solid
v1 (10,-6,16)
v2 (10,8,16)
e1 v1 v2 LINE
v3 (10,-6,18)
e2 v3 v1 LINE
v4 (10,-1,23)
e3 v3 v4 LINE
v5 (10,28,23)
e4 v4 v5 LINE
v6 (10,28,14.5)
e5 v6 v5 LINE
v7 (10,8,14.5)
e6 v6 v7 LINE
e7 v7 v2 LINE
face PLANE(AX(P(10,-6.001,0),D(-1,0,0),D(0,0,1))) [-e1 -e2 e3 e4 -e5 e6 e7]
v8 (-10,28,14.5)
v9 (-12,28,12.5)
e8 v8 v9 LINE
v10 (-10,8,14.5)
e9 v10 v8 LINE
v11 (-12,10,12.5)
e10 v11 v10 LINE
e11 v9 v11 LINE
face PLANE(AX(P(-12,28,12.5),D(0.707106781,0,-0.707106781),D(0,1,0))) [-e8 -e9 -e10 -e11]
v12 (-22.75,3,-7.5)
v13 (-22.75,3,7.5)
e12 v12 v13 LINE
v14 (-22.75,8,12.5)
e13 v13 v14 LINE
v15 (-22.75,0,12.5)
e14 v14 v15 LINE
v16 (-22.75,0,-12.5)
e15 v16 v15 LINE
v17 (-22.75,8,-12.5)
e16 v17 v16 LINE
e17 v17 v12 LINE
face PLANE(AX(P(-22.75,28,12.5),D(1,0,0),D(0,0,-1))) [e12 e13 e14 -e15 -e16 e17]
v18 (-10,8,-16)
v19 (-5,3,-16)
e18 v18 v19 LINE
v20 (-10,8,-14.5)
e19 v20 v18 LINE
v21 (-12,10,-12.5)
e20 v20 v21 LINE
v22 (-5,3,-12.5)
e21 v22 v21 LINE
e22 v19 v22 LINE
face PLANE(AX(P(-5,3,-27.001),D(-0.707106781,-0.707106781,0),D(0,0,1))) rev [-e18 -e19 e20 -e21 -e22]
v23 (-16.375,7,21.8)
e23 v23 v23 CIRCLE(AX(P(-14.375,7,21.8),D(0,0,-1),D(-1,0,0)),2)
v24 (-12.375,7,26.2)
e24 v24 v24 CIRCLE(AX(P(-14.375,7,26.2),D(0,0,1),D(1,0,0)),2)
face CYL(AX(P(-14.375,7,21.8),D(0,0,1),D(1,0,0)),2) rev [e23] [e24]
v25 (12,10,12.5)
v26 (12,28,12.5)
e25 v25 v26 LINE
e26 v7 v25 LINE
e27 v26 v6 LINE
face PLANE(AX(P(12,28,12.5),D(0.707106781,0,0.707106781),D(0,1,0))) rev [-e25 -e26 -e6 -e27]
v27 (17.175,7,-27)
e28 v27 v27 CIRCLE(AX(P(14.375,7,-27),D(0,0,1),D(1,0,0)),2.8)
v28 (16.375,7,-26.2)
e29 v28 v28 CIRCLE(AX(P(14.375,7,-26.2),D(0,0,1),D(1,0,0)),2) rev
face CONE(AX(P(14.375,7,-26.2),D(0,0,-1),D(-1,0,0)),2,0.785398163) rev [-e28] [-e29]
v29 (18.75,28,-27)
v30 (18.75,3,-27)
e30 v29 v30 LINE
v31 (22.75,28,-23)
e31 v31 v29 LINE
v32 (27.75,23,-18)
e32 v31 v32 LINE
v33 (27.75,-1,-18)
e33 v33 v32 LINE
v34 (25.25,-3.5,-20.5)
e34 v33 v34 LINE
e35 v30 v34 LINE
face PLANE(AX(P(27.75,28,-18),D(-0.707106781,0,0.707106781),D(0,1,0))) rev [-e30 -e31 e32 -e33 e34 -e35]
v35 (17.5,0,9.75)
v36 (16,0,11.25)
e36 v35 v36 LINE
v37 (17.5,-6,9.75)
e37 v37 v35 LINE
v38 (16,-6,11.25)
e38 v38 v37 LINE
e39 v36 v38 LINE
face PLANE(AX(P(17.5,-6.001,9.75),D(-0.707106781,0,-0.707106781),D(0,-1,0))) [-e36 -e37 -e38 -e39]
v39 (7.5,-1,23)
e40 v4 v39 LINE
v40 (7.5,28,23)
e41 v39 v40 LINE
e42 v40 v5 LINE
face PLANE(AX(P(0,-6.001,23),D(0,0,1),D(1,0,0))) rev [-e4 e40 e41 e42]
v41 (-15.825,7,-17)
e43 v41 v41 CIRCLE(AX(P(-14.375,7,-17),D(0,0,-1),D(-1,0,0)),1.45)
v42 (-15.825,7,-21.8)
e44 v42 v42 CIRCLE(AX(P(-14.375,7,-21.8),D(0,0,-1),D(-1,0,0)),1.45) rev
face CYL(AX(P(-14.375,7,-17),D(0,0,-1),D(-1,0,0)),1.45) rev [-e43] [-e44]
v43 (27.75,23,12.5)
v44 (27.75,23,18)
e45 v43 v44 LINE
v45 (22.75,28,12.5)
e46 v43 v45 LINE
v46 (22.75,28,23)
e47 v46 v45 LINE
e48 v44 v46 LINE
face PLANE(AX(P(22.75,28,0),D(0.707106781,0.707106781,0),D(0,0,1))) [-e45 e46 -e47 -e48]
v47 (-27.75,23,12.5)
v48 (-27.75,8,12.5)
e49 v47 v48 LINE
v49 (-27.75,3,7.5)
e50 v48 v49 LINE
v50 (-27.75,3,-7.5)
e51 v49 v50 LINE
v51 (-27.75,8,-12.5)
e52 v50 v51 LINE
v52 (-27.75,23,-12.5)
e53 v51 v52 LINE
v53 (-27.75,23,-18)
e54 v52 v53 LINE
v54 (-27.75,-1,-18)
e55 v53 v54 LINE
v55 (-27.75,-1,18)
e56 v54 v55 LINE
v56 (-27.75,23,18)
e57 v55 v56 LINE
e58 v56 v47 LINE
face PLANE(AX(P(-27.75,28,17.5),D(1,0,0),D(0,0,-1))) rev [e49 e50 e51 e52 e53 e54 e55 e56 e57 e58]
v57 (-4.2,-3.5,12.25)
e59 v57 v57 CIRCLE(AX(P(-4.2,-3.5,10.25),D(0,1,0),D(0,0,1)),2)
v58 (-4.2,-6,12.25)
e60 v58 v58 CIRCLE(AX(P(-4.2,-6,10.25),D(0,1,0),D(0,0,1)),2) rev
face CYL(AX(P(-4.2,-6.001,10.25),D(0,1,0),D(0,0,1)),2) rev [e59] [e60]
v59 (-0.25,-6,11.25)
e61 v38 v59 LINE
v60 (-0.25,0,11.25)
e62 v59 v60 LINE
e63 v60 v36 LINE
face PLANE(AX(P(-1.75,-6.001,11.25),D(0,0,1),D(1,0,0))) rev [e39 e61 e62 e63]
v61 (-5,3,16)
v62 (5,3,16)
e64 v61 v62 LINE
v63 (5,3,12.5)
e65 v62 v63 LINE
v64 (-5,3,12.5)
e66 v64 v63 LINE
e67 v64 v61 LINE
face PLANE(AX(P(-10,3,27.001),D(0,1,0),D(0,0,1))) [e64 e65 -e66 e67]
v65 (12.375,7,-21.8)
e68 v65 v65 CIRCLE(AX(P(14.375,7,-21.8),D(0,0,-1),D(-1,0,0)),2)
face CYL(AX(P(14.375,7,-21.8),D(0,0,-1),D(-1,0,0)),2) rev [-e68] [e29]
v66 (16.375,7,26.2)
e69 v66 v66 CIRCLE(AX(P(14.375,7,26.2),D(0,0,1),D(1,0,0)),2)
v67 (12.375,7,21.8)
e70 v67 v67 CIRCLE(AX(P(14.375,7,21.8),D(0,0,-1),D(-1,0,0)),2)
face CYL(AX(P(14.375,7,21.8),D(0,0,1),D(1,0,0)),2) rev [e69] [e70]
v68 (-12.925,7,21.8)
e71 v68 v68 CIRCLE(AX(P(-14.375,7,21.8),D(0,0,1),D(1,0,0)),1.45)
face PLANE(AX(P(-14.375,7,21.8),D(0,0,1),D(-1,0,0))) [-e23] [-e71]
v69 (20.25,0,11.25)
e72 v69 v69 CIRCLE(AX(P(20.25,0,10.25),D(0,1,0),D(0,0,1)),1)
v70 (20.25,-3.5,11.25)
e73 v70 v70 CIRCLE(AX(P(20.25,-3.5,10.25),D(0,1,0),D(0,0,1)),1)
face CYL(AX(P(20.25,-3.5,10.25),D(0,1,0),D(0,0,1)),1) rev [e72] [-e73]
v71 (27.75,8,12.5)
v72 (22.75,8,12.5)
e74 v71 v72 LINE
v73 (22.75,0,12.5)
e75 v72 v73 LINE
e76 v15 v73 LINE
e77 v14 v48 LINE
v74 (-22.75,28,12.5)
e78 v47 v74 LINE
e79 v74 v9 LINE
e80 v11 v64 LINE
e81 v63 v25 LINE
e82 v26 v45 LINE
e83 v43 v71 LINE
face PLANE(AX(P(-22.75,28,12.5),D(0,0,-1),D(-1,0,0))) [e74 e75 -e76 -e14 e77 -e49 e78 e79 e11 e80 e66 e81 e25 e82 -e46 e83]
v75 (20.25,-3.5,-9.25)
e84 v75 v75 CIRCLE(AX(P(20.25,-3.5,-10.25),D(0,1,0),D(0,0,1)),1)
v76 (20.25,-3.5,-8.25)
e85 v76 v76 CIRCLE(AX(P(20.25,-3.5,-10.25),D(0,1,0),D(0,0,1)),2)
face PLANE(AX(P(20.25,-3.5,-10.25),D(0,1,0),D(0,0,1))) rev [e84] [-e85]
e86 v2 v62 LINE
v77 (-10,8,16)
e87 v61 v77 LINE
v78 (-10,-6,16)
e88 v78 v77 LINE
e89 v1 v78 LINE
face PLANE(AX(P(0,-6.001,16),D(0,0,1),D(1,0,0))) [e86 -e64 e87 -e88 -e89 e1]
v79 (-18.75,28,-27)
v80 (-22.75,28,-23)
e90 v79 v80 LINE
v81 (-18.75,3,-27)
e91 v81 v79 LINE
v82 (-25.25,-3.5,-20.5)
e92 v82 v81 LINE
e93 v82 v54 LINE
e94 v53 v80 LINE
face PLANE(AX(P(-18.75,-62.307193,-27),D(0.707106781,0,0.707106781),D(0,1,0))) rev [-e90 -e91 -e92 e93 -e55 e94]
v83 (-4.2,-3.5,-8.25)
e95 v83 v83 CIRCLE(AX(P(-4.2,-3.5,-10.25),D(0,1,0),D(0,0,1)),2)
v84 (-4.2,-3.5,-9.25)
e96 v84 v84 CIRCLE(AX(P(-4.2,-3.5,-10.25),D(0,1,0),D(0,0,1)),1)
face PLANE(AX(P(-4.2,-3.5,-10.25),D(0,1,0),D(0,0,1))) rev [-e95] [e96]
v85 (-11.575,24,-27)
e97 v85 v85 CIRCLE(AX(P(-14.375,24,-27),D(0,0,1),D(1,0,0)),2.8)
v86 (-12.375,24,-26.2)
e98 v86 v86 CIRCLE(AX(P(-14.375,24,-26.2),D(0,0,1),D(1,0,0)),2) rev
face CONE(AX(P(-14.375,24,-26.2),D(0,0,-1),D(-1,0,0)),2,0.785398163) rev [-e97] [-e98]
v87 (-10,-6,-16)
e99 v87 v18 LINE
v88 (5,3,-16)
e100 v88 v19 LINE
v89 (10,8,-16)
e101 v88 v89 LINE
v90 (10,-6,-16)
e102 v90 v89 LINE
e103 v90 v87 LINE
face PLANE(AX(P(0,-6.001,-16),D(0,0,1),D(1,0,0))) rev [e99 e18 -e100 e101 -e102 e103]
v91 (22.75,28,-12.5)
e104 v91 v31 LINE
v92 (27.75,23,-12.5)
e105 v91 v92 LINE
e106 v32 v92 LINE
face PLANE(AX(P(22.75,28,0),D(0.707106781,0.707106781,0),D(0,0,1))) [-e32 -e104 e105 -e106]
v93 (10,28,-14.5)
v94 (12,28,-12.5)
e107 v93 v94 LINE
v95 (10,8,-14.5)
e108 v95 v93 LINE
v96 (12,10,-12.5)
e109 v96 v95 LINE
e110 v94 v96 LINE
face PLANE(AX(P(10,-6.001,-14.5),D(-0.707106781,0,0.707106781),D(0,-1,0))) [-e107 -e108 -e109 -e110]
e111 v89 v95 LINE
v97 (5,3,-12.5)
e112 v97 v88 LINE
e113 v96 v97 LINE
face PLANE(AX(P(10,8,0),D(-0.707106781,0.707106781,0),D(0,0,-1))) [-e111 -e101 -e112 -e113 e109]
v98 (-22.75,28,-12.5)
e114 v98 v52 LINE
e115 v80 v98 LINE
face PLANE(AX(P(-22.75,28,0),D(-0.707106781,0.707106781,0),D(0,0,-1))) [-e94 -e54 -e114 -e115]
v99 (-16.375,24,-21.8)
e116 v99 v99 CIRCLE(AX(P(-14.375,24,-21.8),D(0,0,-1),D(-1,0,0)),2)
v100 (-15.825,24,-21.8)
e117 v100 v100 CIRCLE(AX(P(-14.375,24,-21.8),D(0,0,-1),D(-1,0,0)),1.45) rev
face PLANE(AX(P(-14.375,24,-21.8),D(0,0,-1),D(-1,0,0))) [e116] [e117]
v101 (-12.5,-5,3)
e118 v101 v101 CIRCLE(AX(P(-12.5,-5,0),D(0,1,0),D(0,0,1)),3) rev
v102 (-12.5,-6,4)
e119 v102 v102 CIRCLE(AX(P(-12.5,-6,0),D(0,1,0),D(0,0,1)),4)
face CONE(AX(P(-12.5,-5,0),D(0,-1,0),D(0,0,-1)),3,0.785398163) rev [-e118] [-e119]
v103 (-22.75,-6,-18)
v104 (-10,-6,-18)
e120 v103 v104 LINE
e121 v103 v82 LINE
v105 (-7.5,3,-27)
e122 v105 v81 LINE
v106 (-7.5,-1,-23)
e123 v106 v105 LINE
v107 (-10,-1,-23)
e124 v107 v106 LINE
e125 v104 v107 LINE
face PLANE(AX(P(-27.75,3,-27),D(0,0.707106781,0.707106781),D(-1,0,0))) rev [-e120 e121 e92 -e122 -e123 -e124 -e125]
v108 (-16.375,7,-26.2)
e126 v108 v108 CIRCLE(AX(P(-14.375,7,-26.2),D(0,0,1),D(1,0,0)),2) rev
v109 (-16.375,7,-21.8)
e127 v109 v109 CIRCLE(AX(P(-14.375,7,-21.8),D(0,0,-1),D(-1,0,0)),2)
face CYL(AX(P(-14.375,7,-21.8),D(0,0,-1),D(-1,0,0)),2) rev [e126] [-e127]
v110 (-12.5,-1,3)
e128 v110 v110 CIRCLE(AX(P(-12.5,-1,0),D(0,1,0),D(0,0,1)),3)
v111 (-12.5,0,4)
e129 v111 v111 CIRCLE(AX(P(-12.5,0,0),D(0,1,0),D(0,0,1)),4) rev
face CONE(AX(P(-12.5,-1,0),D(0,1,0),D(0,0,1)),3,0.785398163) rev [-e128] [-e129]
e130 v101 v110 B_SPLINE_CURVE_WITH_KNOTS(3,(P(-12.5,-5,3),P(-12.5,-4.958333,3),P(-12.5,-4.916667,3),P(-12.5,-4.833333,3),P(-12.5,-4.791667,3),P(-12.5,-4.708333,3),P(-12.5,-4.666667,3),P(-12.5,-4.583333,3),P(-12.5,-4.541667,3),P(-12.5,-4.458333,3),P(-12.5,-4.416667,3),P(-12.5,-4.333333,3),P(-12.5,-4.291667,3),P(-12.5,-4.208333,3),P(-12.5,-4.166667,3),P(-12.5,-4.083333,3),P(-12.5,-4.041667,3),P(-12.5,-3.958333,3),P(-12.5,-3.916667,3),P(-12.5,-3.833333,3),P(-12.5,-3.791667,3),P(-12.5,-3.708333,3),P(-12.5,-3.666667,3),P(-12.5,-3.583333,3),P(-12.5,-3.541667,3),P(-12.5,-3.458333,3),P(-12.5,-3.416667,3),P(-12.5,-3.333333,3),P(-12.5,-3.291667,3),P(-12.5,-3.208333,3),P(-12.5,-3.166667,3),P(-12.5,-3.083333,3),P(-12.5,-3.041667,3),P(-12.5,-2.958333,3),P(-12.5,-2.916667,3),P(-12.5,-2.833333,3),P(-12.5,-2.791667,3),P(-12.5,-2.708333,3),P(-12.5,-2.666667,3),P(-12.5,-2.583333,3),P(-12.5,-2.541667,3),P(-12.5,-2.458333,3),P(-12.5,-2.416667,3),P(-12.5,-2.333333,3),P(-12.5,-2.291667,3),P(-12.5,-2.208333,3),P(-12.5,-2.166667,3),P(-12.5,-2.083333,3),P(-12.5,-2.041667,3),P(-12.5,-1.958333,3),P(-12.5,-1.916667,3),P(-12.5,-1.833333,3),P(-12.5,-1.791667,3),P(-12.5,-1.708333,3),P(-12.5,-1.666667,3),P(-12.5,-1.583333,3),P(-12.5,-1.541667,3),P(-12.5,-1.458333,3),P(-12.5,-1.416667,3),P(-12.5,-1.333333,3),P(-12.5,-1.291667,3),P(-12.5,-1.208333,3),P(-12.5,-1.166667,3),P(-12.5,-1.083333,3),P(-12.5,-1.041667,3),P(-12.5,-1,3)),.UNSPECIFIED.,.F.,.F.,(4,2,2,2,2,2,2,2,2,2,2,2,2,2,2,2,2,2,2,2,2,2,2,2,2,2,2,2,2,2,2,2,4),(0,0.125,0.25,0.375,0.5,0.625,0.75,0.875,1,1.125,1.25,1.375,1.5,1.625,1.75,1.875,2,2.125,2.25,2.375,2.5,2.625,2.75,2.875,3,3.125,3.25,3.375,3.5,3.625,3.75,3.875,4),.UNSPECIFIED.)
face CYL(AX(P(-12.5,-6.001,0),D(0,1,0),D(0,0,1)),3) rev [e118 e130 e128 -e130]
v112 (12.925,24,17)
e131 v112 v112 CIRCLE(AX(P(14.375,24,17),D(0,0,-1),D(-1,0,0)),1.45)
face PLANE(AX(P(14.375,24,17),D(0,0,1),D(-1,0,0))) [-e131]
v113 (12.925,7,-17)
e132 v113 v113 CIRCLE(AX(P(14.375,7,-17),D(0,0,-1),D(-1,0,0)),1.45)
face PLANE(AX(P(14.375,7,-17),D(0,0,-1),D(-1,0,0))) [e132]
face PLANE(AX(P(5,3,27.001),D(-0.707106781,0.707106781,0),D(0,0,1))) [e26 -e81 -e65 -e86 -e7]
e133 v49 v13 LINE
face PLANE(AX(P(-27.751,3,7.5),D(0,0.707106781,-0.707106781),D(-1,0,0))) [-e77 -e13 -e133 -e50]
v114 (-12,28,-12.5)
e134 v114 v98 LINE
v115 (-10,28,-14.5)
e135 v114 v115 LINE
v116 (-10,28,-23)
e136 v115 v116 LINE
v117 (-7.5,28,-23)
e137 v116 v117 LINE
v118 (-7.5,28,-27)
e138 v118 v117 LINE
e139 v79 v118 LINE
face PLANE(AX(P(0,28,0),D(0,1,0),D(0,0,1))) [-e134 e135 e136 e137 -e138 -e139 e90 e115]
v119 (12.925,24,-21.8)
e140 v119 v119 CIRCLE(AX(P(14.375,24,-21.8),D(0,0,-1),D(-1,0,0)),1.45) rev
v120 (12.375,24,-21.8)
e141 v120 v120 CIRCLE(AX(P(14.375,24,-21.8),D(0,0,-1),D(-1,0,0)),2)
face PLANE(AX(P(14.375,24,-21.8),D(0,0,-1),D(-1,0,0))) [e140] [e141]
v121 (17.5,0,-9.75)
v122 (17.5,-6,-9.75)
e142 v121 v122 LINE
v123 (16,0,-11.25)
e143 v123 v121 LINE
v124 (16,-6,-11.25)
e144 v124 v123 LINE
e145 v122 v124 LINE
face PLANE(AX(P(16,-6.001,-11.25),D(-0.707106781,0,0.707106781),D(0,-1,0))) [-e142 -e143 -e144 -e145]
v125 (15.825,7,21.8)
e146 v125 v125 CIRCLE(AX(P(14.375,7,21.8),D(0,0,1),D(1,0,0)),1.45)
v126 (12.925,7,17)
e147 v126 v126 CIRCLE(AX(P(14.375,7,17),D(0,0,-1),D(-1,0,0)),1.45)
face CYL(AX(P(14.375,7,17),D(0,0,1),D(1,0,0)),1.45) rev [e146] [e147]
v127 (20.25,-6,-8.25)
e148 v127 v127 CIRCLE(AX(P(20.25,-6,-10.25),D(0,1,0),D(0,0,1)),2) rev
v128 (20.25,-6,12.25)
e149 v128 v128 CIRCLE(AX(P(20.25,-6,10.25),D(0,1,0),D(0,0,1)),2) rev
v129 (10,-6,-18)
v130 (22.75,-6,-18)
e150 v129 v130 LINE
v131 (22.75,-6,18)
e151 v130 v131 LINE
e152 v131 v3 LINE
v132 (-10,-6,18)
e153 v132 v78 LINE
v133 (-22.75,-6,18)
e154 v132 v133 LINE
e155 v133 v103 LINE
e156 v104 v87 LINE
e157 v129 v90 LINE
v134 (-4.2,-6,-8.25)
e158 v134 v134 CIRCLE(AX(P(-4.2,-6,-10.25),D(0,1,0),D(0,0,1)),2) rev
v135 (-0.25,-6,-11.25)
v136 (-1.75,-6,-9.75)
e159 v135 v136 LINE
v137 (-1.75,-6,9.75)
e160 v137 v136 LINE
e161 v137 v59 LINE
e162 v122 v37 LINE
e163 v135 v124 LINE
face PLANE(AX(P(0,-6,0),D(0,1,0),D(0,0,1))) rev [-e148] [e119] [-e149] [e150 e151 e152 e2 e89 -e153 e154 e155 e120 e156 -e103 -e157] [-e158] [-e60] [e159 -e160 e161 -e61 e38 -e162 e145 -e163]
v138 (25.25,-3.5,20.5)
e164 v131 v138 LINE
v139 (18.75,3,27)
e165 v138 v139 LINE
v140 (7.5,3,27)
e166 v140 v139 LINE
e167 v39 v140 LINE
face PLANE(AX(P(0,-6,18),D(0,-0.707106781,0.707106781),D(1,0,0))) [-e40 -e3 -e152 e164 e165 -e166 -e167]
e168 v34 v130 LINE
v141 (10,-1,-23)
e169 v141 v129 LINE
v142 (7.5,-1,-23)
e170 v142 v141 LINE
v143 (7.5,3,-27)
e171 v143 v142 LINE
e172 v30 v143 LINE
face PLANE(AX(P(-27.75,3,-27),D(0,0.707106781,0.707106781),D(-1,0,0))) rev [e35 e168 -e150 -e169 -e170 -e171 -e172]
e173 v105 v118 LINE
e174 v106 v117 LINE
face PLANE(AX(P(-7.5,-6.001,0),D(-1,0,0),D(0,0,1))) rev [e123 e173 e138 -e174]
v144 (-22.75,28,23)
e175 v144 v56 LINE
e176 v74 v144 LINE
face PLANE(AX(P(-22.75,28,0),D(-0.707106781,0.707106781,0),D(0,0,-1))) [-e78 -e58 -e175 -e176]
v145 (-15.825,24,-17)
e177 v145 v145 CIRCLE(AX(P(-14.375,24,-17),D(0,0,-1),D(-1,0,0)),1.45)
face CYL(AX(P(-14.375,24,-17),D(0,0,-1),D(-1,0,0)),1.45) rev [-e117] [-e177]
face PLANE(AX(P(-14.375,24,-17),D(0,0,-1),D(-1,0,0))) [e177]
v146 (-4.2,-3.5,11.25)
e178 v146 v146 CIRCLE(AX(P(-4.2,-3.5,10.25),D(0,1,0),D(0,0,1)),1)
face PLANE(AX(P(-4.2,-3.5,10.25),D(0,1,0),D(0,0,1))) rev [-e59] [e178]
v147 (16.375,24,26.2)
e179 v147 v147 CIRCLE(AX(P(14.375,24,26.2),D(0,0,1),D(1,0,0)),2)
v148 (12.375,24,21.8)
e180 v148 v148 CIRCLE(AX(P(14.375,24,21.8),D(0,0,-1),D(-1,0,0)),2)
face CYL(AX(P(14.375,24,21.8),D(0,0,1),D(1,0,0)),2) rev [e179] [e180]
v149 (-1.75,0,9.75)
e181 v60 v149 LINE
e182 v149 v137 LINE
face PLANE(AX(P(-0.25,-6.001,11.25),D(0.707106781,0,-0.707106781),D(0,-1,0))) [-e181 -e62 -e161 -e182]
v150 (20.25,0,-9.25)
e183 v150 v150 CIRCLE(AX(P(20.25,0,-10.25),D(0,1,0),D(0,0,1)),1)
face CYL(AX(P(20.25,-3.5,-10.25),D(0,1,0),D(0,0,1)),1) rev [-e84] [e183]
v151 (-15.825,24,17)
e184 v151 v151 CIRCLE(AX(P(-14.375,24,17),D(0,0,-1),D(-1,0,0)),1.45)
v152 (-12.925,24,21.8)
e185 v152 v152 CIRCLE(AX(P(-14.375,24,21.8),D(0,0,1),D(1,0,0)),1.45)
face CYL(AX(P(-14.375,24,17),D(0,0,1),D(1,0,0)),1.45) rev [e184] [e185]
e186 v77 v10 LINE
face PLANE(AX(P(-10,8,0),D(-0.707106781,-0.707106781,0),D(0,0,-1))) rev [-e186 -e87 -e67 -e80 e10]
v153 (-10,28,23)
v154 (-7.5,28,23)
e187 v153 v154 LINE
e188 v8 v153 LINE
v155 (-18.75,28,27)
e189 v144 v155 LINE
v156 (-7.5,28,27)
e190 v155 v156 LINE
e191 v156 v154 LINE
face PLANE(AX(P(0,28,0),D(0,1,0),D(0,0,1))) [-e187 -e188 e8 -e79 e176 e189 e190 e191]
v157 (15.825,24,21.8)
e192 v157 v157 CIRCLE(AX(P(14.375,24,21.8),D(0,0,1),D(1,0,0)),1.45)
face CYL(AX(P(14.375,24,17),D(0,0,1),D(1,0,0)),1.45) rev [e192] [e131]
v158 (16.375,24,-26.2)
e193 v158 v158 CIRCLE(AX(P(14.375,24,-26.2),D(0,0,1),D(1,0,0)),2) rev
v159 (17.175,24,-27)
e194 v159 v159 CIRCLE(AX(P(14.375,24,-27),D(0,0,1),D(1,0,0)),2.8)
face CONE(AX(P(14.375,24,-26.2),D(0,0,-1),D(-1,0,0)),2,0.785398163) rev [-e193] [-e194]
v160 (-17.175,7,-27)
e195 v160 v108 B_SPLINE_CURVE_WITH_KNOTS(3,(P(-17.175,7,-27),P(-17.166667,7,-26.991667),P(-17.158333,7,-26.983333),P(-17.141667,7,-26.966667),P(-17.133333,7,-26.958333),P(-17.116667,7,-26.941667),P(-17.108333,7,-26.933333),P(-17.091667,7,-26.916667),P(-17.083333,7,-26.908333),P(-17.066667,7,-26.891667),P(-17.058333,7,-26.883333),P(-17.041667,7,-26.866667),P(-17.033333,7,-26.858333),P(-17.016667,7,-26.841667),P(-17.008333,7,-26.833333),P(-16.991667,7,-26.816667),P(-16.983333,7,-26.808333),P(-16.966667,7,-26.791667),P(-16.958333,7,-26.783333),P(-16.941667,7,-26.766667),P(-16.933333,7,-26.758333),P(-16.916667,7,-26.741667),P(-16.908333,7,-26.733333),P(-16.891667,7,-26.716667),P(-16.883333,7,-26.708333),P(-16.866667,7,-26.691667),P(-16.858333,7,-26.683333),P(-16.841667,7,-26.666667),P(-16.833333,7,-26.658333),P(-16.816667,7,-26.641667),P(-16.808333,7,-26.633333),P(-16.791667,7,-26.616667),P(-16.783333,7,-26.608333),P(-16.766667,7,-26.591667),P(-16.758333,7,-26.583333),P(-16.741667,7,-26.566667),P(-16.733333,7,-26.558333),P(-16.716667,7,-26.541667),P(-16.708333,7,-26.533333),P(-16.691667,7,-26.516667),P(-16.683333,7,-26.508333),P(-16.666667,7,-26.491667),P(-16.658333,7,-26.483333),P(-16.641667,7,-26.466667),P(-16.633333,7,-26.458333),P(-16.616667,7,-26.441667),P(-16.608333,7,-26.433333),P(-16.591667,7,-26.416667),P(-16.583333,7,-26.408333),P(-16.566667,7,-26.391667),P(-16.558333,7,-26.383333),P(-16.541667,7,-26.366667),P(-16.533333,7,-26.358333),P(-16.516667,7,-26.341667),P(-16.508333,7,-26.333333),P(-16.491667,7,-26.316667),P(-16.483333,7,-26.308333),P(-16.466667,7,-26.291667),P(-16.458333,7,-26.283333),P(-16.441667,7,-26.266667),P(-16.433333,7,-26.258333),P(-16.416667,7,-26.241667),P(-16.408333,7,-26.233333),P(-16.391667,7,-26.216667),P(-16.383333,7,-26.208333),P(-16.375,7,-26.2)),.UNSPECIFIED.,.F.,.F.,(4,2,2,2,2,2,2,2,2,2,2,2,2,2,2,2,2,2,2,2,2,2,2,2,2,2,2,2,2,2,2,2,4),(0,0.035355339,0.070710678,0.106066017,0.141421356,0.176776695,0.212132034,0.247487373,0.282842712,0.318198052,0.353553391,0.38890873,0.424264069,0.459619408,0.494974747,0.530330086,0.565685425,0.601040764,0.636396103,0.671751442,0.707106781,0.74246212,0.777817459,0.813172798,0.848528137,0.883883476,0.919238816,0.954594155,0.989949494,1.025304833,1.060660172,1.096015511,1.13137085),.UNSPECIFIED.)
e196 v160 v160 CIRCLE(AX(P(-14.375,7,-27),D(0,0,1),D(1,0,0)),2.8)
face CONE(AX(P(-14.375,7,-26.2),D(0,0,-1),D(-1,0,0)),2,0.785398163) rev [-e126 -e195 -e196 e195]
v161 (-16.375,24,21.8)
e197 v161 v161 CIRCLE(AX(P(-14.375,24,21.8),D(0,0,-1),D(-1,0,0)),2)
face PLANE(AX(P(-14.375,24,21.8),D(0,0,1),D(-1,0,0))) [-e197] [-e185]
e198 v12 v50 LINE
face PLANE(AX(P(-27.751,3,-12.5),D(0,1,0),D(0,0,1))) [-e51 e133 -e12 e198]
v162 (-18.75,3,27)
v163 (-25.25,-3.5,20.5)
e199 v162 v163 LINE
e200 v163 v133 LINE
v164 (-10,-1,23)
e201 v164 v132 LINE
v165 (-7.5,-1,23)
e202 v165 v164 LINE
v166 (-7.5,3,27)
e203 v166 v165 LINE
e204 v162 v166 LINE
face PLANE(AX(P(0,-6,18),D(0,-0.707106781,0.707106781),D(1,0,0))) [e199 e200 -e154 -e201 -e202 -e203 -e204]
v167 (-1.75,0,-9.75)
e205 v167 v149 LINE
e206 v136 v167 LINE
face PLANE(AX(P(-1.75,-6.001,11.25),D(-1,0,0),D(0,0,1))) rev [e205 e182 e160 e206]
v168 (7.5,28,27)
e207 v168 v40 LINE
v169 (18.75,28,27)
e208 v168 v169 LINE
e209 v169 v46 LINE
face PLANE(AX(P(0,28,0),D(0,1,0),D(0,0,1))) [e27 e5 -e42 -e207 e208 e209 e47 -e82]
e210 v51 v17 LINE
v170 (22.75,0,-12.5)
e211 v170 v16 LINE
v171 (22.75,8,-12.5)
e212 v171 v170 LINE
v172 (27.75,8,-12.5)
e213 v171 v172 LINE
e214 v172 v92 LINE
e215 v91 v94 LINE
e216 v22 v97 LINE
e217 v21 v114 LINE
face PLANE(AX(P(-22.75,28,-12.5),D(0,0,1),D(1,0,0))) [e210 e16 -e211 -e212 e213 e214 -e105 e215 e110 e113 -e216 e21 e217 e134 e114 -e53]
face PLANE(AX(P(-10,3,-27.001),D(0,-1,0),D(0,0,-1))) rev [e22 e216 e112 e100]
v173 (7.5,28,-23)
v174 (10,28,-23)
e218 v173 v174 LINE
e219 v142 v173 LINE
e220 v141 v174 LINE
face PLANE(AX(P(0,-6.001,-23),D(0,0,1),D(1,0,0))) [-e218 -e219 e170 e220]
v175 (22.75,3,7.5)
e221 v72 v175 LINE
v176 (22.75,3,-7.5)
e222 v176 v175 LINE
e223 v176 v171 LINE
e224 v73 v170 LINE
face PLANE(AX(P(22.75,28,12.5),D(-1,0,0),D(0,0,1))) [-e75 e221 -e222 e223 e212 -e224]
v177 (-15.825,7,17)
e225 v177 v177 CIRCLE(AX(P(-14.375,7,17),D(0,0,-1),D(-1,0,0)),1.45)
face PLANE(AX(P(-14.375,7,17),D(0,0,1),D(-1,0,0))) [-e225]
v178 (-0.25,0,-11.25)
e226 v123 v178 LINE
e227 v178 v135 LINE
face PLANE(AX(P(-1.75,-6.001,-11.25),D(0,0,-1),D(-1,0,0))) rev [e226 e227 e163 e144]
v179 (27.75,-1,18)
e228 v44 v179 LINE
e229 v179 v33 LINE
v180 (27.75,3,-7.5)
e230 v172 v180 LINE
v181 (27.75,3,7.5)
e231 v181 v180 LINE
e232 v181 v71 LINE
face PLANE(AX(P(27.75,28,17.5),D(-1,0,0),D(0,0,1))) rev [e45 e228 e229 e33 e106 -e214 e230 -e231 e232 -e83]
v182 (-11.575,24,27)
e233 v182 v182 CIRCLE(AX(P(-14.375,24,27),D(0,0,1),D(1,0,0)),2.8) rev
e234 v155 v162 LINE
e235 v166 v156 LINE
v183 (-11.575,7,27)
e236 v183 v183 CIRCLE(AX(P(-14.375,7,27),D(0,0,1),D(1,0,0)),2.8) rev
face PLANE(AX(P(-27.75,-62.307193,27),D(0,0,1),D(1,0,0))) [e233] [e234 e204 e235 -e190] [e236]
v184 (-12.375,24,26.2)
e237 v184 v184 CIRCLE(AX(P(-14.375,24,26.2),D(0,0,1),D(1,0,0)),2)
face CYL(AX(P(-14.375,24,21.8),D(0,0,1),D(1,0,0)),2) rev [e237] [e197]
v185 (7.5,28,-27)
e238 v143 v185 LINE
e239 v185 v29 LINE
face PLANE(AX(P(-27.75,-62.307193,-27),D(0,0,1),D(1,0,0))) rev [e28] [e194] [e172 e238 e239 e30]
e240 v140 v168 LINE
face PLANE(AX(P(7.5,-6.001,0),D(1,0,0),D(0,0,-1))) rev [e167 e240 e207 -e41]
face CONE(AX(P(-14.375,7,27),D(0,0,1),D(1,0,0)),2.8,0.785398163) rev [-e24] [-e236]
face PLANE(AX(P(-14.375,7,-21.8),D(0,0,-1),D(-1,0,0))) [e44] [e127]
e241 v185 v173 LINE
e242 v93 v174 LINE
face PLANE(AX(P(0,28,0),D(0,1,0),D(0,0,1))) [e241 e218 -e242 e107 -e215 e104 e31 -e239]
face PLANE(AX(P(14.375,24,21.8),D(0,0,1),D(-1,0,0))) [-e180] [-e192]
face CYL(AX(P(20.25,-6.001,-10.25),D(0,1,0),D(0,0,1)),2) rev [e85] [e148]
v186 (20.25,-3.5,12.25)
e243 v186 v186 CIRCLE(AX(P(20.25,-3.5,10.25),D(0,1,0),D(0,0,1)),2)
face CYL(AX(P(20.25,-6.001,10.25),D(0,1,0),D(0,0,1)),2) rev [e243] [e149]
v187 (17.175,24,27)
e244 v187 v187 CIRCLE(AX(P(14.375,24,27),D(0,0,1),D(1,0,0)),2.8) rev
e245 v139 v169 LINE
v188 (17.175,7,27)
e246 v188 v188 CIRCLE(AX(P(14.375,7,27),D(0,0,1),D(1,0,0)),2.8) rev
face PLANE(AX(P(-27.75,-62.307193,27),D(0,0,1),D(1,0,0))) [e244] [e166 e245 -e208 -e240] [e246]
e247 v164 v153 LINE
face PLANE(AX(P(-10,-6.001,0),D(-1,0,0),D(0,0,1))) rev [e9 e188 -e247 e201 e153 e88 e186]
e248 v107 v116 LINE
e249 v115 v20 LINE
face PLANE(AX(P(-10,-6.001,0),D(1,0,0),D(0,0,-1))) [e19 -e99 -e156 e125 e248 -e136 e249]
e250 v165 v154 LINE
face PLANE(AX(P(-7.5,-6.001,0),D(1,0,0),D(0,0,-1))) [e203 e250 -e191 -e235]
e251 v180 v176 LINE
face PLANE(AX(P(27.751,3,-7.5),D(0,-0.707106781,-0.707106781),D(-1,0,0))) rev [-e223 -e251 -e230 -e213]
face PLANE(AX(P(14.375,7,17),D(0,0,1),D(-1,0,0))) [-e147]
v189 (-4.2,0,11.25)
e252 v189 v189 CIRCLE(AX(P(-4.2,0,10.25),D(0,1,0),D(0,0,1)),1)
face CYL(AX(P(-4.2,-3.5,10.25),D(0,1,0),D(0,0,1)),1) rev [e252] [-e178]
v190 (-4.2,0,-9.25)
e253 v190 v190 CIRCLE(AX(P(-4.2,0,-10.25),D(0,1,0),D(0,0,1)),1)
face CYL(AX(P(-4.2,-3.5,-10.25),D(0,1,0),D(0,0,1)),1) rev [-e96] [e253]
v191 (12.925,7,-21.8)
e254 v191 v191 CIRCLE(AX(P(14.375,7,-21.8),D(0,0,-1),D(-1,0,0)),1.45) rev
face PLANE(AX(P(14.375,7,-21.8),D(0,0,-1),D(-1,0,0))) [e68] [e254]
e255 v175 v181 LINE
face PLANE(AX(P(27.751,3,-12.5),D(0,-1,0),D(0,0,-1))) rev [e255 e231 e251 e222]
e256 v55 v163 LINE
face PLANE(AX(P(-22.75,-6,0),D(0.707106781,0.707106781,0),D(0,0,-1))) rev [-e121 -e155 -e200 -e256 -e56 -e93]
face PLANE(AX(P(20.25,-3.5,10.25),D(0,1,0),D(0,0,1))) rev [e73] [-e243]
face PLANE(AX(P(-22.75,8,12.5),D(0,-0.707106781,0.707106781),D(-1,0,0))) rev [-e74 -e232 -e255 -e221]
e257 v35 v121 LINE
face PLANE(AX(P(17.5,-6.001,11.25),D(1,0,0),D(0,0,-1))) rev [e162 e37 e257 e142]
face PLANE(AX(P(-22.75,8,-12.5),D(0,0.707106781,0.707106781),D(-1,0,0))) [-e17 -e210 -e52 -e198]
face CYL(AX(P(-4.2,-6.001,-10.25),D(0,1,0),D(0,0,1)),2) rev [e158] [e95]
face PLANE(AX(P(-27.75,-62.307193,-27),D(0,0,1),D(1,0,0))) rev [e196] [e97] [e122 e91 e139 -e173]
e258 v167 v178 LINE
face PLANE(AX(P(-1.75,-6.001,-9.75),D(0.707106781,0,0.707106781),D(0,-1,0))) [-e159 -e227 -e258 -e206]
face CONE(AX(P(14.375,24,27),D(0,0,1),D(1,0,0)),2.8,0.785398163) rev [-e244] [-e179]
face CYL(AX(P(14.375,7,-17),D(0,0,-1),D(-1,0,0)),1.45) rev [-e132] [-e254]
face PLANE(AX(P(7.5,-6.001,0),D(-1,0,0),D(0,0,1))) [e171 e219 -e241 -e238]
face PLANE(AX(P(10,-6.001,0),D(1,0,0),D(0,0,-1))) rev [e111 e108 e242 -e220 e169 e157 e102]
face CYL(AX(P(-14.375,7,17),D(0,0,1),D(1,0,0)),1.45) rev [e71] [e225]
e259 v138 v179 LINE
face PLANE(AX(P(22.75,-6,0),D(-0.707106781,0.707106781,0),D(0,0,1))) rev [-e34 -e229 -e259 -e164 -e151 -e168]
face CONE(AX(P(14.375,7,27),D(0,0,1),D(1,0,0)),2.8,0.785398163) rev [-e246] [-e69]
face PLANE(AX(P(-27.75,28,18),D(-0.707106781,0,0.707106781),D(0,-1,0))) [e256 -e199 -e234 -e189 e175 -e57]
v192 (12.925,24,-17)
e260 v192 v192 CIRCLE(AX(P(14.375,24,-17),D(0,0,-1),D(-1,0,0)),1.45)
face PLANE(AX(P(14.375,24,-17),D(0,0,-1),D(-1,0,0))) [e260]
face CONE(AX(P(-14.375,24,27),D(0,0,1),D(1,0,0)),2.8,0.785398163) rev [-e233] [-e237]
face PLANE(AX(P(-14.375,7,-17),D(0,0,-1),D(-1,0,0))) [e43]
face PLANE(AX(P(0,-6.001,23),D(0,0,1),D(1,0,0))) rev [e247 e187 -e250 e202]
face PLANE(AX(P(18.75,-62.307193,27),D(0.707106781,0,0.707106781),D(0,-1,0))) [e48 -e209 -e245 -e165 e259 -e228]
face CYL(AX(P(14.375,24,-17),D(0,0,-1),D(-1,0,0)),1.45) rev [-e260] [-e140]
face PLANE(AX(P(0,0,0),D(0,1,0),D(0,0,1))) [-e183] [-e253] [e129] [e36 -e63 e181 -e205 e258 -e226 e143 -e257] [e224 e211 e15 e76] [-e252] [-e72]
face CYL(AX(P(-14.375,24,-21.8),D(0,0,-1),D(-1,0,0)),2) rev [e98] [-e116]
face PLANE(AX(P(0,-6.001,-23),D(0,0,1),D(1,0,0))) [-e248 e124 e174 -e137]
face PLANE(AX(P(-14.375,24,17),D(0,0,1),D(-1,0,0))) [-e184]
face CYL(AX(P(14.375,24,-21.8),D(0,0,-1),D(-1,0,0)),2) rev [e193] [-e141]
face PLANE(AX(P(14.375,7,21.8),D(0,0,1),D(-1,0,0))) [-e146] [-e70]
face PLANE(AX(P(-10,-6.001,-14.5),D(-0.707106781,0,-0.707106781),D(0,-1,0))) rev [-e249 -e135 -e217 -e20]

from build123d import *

# Parameters (mm, degrees)
SKETCH1_W           = 55.5
SKETCH1_H           = 35
SKETCH1_W_2         = 45.5
SKETCH1_H_2         = 25
BOSS_EXTRUDE1_DEPTH = 28
SKETCH2_W           = 55.5
SKETCH2_H           = 35
BOSS_EXTRUDE2_DEPTH = 6
SKETCH4_R           = 1
CUT_EXTRUDE1_DEPTH  = 3.5
CUT_EXTRUDE2_REACH  = 47.481
SKETCH5_R           = 2
CUT_EXTRUDE3_REACH  = 45.131
SKETCH6_W           = 19.25
SKETCH6_H           = 22.5
CHAMFER1_SIZE       = 1.5
CUT_EXTRUDE4_REACH  = 45.131
SKETCH7_R           = 3
CHAMFER2_SIZE       = 1
SKETCH8_W           = 55.5
SKETCH8_H           = 9.5
BOSS_EXTRUDE3_DEPTH = 34
CUT_EXTRUDE5_REACH  = 53.527
SKETCH10_W          = 20
SKETCH10_H          = 7
SKETCH10_W_2        = 15
SKETCH10_H_2        = 4
CHAMFER7_SIZE       = 9
CHAMFER8_SIZE       = 5
CHAMFER9_SIZE       = 5
SKETCH12_R          = 1.45
CUT_EXTRUDE7_DEPTH  = 10
CUT_EXTRUDE8_REACH  = 57.806
SKETCH13_W          = 20
SKETCH13_H          = 25
CUT_EXTRUDE9_REACH  = 65.744
SKETCH14_W          = 25
SKETCH14_H          = 25
CHAMFER10_SIZE      = 5
CHAMFER11_SIZE      = 2
SKETCH15_R          = 2
CUT_EXTRUDE10_DEPTH = 5.2
CHAMFER12_SIZE      = 0.8


# Some blends are built 0.0001 mm under size
with BuildPart() as part:
    # Sketch1 → Boss-Extrude1 (new body)
    with BuildSketch(Plane(origin=(0, 0, 0), x_dir=(1, 0, 0), z_dir=(0, 1, 0))):
        Rectangle(SKETCH1_W, SKETCH1_H)
        Rectangle(SKETCH1_W_2, SKETCH1_H_2, mode=Mode.SUBTRACT)
    extrude(amount=BOSS_EXTRUDE1_DEPTH)

    # Sketch2 → Boss-Extrude2 (add)
    with BuildSketch(Plane.XZ):
        Rectangle(SKETCH2_W, SKETCH2_H)
    extrude(amount=BOSS_EXTRUDE2_DEPTH)

    # Sketch4 → Cut-Extrude1 (cut)
    with BuildSketch(Plane(origin=(0, 0, 0), x_dir=(1, 0, 0), z_dir=(0, 1, 0))):
        with Locations(Location((-4.2, 10.25, 0), (0, 0, 270))):
            Circle(SKETCH4_R)
        with Locations(Location((20.25, 10.25, 0), (0, 0, 270))):
            Circle(SKETCH4_R)
        with Locations(Location((20.25, -10.25, 0), (0, 0, 270))):
            Circle(SKETCH4_R)
        with Locations(Location((-4.2, -10.25, 0), (0, 0, 270))):
            Circle(SKETCH4_R)
    extrude(amount=-CUT_EXTRUDE1_DEPTH, mode=Mode.SUBTRACT)

    # Sketch5 → Cut-Extrude2 (cut, up to next)
    with BuildSketch(Plane(origin=(0, -3.5, 0), x_dir=(1, 0, 0), z_dir=(0, 1, 0)), mode=Mode.PRIVATE) as cut_extrude2_sk1:
        with Locations(Location((-4.2, 10.25, 0), (0, 0, 270))):
            Circle(SKETCH5_R)
    cut_extrude2_tool1 = extrude(cut_extrude2_sk1.sketch, amount=-CUT_EXTRUDE2_REACH, mode=Mode.PRIVATE) & part.part
    # Sketch5 → Cut-Extrude2 (cut, up to next)
    with BuildSketch(Plane(origin=(0, -3.5, 0), x_dir=(1, 0, 0), z_dir=(0, 1, 0)), mode=Mode.PRIVATE) as cut_extrude2_sk2:
        with Locations(Location((20.25, 10.25, 0), (0, 0, 270))):
            Circle(SKETCH5_R)
    cut_extrude2_tool2 = extrude(cut_extrude2_sk2.sketch, amount=-CUT_EXTRUDE2_REACH, mode=Mode.PRIVATE) & part.part
    # Sketch5 → Cut-Extrude2 (cut, up to next)
    with BuildSketch(Plane(origin=(0, -3.5, 0), x_dir=(1, 0, 0), z_dir=(0, 1, 0)), mode=Mode.PRIVATE) as cut_extrude2_sk3:
        with Locations(Location((20.25, -10.25, 0), (0, 0, 270))):
            Circle(SKETCH5_R)
    cut_extrude2_tool3 = extrude(cut_extrude2_sk3.sketch, amount=-CUT_EXTRUDE2_REACH, mode=Mode.PRIVATE) & part.part
    # Sketch5 → Cut-Extrude2 (cut, up to next)
    with BuildSketch(Plane(origin=(0, -3.5, 0), x_dir=(1, 0, 0), z_dir=(0, 1, 0)), mode=Mode.PRIVATE) as cut_extrude2_sk4:
        with Locations(Location((-4.2, -10.25, 0), (0, 0, 270))):
            Circle(SKETCH5_R)
    cut_extrude2_tool4 = extrude(cut_extrude2_sk4.sketch, amount=-CUT_EXTRUDE2_REACH, mode=Mode.PRIVATE) & part.part
    add(cut_extrude2_tool1.solids().sort_by_distance((-4.2, -3.5, -10.25))[0], mode=Mode.SUBTRACT)
    add(cut_extrude2_tool2.solids().sort_by_distance((20.25, -3.5, -10.25))[0], mode=Mode.SUBTRACT)
    add(cut_extrude2_tool3.solids().sort_by_distance((20.25, -3.5, 10.25))[0], mode=Mode.SUBTRACT)
    add(cut_extrude2_tool4.solids().sort_by_distance((-4.2, -3.5, 10.25))[0], mode=Mode.SUBTRACT)

    # Sketch6 → Cut-Extrude3 (cut, up to next)
    with BuildSketch(Plane(origin=(0, 0, 0), x_dir=(1, 0, 0), z_dir=(0, 1, 0)), mode=Mode.PRIVATE) as cut_extrude3_sk1:
        with Locations((7.875, 0)):
            Rectangle(SKETCH6_W, SKETCH6_H)
    cut_extrude3_tool1 = extrude(cut_extrude3_sk1.sketch, amount=-CUT_EXTRUDE3_REACH, mode=Mode.PRIVATE) & part.part
    add(cut_extrude3_tool1.solids().sort_by_distance((7.875, 0, 0))[0], mode=Mode.SUBTRACT)

    # Chamfer1
    chamfer1_edges = [part.edges().sort_by_distance(p)[0] for p in [
        (17.5, -3, -11.25),
        (17.5, -3, 11.25),
        (-1.75, -3, 11.25),
        (-1.75, -3, -11.25),
    ]]
    chamfer(chamfer1_edges, length=CHAMFER1_SIZE)

    # Sketch7 → Cut-Extrude4 (cut, up to next)
    with BuildSketch(Plane(origin=(0, 0, 0), x_dir=(1, 0, 0), z_dir=(0, 1, 0)), mode=Mode.PRIVATE) as cut_extrude4_sk1:
        with Locations(Location((-12.5, 0, 0), (0, 0, 270))):
            Circle(SKETCH7_R)
    cut_extrude4_tool1 = extrude(cut_extrude4_sk1.sketch, amount=-CUT_EXTRUDE4_REACH, mode=Mode.PRIVATE) & part.part
    add(cut_extrude4_tool1.solids().sort_by_distance((-12.5, 0, 0))[0], mode=Mode.SUBTRACT)

    # Chamfer2
    chamfer2_edges = [part.edges().sort_by_distance(p)[0] for p in [
        (-12.5, 0, -3),
        (-12.5, -6, -3),
    ]]
    chamfer(chamfer2_edges, length=CHAMFER2_SIZE)

    # Sketch8 → Boss-Extrude3 (add)
    with BuildSketch(Plane(origin=(0, 28, 0), x_dir=(1, 0, 0), z_dir=(0, 1, 0))):
        with Locations((0, -22.25)):
            Rectangle(SKETCH8_W, SKETCH8_H)
    boss_extrude3 = extrude(amount=-BOSS_EXTRUDE3_DEPTH)

    # Sketch10 → Cut-Extrude5 (cut, up to next)
    with BuildSketch(Plane(origin=(0, 28, 0), x_dir=(1, 0, 0), z_dir=(0, 1, 0)), mode=Mode.PRIVATE) as cut_extrude5_sk1:
        with Locations((0, -19.5)):
            Rectangle(SKETCH10_W, SKETCH10_H)
    cut_extrude5_tool1 = extrude(cut_extrude5_sk1.sketch, amount=-CUT_EXTRUDE5_REACH, mode=Mode.PRIVATE) & part.part
    # Sketch10 → Cut-Extrude5 (cut, up to next)
    with BuildSketch(Plane(origin=(0, 28, 0), x_dir=(1, 0, 0), z_dir=(0, 1, 0)), mode=Mode.PRIVATE) as cut_extrude5_sk2:
        with Locations((0, -25)):
            Rectangle(SKETCH10_W_2, SKETCH10_H_2)
    cut_extrude5_tool2 = extrude(cut_extrude5_sk2.sketch, amount=-CUT_EXTRUDE5_REACH, mode=Mode.PRIVATE) & part.part
    cut_extrude5_1 = cut_extrude5_tool1.solids().sort_by_distance((0, 28, 19.5))[0]
    add(cut_extrude5_1, mode=Mode.SUBTRACT)
    cut_extrude5_2 = cut_extrude5_tool2.solids().sort_by_distance((0, 28, 25))[0]
    add(cut_extrude5_2, mode=Mode.SUBTRACT)
    cut_extrude5 = cut_extrude5_1 + cut_extrude5_2  # Cut-Extrude5 as one shape, for the pattern or mirror that repeats it

    # Mirror3: Boss-Extrude3, Cut-Extrude5 across plane
    add(boss_extrude3.mirror(Plane.XY))
    add(cut_extrude5.mirror(Plane.XY), mode=Mode.SUBTRACT)

    # Chamfer7
    chamfer7_edges = [part.edges().sort_by_distance(p)[0] for p in [
        (17.625, -6, -27),
        (-27.75, 11, -27),
        (27.75, 11, -27),
        (-17.625, -6, -27),
        (17.625, -6, 27),
        (27.75, 11, 27),
        (-17.625, -6, 27),
        (-27.75, 11, 27),
    ]]
    chamfer(chamfer7_edges, length=CHAMFER7_SIZE)

    # Chamfer8
    chamfer8_edges = [part.edges().sort_by_distance(p)[0] for p in [
        (27.75, 28, 0),
        (-27.75, 28, 0),
    ]]
    chamfer(chamfer8_edges, length=CHAMFER8_SIZE - 0.0001)  # a hair under: the kernel refuses the full size

    # Chamfer9
    chamfer9_edges = [part.edges().sort_by_distance(p)[0] for p in [
        (27.75, -6, 0),
        (-27.75, -6, 0),
    ]]
    chamfer(chamfer9_edges, length=CHAMFER9_SIZE)

    # Sketch12 → Cut-Extrude7 (cut)
    with BuildSketch(Plane(origin=(0, 0, -27), x_dir=(-1, 0, 0), z_dir=(0, 0, -1))):
        with Locations((-14.375, 24)):
            Circle(SKETCH12_R)
        with Locations((14.375, 24)):
            Circle(SKETCH12_R)
        with Locations((14.375, 7)):
            Circle(SKETCH12_R)
        with Locations((-14.375, 7)):
            Circle(SKETCH12_R)
    cut_extrude7 = extrude(amount=-CUT_EXTRUDE7_DEPTH, mode=Mode.SUBTRACT)

    # Mirror4: Cut-Extrude7 across plane
    add(cut_extrude7.mirror(Plane.XY), mode=Mode.SUBTRACT)

    # Sketch13 → Cut-Extrude8 (cut, up to next)
    with BuildSketch(Plane.XY.offset(-12.5), mode=Mode.PRIVATE) as cut_extrude8_sk1:
        with Locations((0, 15.5)):
            Rectangle(SKETCH13_W, SKETCH13_H)
    cut_extrude8_tool1 = extrude(cut_extrude8_sk1.sketch, amount=-CUT_EXTRUDE8_REACH, mode=Mode.PRIVATE) & part.part
    cut_extrude8 = cut_extrude8_tool1.solids().sort_by_distance((0, 15.5, -12.5))[0]
    add(cut_extrude8, mode=Mode.SUBTRACT)

    # Sketch14 → Cut-Extrude9 (cut, up to next)
    with BuildSketch(Plane.ZY.offset(-22.75), mode=Mode.PRIVATE) as cut_extrude9_sk1:
        with Locations((0, 15.5)):
            Rectangle(SKETCH14_W, SKETCH14_H)
    cut_extrude9_tool1 = extrude(cut_extrude9_sk1.sketch, amount=-CUT_EXTRUDE9_REACH, mode=Mode.PRIVATE) & part.part
    cut_extrude9 = cut_extrude9_tool1.solids().sort_by_distance((22.75, 15.5, 0))[0]
    add(cut_extrude9, mode=Mode.SUBTRACT)

    # Mirror5: Cut-Extrude9 across plane
    add(cut_extrude9.mirror(Plane(origin=(0, 0, 0), x_dir=(0, 0, 1), z_dir=(1, 0, 0))), mode=Mode.SUBTRACT)

    # Mirror6: Cut-Extrude8 across plane
    add(cut_extrude8.mirror(Plane.XY), mode=Mode.SUBTRACT)

    # Chamfer10
    # the kernel refuses this chamfer: 5 mm, written as the material it adds along each edge
    with BuildSketch(Plane(origin=(-10, 3, -12.5), x_dir=(0.9996219169112968, -0.027495876610586403, 0), z_dir=(0, 0, -1)), Plane(origin=(10, 3, -12.5), x_dir=(0.027495876610586327, 0.9996219169112968, 0), z_dir=(0, 0, -1)), Plane(origin=(-10, 3, 12.5), x_dir=(-0.027495876610586317, 0.9996219169112968, 0), z_dir=(0, 0, 1))) as chamfer10_piece_1:
        Polygon((CHAMFER10_SIZE * 0.999621916911, -CHAMFER10_SIZE * 0.0274958766106), (-CHAMFER10_SIZE * 0.0274958766106, -CHAMFER10_SIZE * 0.999621916911), (0, 0), align=None)
    extrude(amount=3.5)
    with BuildSketch(Plane(origin=(22.75, 3, -12.5), x_dir=(0, -0.027495876610586403, 0.9996219169112968), z_dir=(1, 0, 0))) as chamfer10_piece_2:
        Polygon((CHAMFER10_SIZE * 0.999621916911, -CHAMFER10_SIZE * 0.0274958766106), (-CHAMFER10_SIZE * 0.0274958766106, -CHAMFER10_SIZE * 0.999621916911), (0, 0), align=None)
    extrude(amount=5)
    with BuildSketch(Plane(origin=(22.75, 3, 12.5), x_dir=(0, -0.027495876610586403, -0.9996219169112968), z_dir=(1, 0, 0)), Plane(origin=(-22.75, 3, -12.5), x_dir=(0, -0.027495876610586403, 0.9996219169112968), z_dir=(-1, 0, 0)), Plane(origin=(-22.75, 3, 12.5), x_dir=(0, 0.9996219169112968, 0.027495876610586327), z_dir=(-1, 0, 0))) as chamfer10_piece_3:
        Polygon((CHAMFER10_SIZE * 0.999621916911, CHAMFER10_SIZE * 0.0274958766106), (-CHAMFER10_SIZE * 0.0274958766106, CHAMFER10_SIZE * 0.999621916911), (0, 0), align=None)
    extrude(amount=5)
    with BuildSketch(Plane(origin=(10, 3, 12.5), x_dir=(0.027495876610586327, 0.9996219169112968, 0), z_dir=(0, 0, 1))) as chamfer10_piece_4:
        Polygon((CHAMFER10_SIZE * 0.999621916911, CHAMFER10_SIZE * 0.0274958766106), (-CHAMFER10_SIZE * 0.0274958766106, CHAMFER10_SIZE * 0.999621916911), (0, 0), align=None)
    extrude(amount=3.5)

    # Chamfer11
    chamfer11_edges = [part.edges().sort_by_distance(p)[0] for p in [
        (-10, 18, -12.5),
        (-10, 18, 12.5),
        (10, 18, 12.5),
        (10, 18, -12.5),
    ]]
    chamfer(chamfer11_edges, length=CHAMFER11_SIZE)

    # Sketch15 → Cut-Extrude10 (cut)
    with BuildSketch(Plane(origin=(0, 0, -27), x_dir=(-1, 0, 0), z_dir=(0, 0, -1))):
        with Locations((-14.375, 24)):
            Circle(SKETCH15_R)
        with Locations((14.375, 24)):
            Circle(SKETCH15_R)
        with Locations((14.375, 7)):
            Circle(SKETCH15_R)
        with Locations((-14.375, 7)):
            Circle(SKETCH15_R)
    cut_extrude10 = extrude(amount=-CUT_EXTRUDE10_DEPTH, mode=Mode.SUBTRACT)

    # Mirror7: Cut-Extrude10 across plane
    add(cut_extrude10.mirror(Plane.XY), mode=Mode.SUBTRACT)

    # Chamfer12
    chamfer12_edges = [part.edges().sort_by_distance(p)[0] for p in [
        (16.375, 7, -27),
        (-12.375, 7, -27),
        (-12.375, 24, -27),
        (16.375, 24, -27),
        (16.375, 7, 27),
        (-12.375, 7, 27),
        (-12.375, 24, 27),
        (16.375, 24, 27),
    ]]
    chamfer(chamfer12_edges, length=CHAMFER12_SIZE)


solid = part.part
